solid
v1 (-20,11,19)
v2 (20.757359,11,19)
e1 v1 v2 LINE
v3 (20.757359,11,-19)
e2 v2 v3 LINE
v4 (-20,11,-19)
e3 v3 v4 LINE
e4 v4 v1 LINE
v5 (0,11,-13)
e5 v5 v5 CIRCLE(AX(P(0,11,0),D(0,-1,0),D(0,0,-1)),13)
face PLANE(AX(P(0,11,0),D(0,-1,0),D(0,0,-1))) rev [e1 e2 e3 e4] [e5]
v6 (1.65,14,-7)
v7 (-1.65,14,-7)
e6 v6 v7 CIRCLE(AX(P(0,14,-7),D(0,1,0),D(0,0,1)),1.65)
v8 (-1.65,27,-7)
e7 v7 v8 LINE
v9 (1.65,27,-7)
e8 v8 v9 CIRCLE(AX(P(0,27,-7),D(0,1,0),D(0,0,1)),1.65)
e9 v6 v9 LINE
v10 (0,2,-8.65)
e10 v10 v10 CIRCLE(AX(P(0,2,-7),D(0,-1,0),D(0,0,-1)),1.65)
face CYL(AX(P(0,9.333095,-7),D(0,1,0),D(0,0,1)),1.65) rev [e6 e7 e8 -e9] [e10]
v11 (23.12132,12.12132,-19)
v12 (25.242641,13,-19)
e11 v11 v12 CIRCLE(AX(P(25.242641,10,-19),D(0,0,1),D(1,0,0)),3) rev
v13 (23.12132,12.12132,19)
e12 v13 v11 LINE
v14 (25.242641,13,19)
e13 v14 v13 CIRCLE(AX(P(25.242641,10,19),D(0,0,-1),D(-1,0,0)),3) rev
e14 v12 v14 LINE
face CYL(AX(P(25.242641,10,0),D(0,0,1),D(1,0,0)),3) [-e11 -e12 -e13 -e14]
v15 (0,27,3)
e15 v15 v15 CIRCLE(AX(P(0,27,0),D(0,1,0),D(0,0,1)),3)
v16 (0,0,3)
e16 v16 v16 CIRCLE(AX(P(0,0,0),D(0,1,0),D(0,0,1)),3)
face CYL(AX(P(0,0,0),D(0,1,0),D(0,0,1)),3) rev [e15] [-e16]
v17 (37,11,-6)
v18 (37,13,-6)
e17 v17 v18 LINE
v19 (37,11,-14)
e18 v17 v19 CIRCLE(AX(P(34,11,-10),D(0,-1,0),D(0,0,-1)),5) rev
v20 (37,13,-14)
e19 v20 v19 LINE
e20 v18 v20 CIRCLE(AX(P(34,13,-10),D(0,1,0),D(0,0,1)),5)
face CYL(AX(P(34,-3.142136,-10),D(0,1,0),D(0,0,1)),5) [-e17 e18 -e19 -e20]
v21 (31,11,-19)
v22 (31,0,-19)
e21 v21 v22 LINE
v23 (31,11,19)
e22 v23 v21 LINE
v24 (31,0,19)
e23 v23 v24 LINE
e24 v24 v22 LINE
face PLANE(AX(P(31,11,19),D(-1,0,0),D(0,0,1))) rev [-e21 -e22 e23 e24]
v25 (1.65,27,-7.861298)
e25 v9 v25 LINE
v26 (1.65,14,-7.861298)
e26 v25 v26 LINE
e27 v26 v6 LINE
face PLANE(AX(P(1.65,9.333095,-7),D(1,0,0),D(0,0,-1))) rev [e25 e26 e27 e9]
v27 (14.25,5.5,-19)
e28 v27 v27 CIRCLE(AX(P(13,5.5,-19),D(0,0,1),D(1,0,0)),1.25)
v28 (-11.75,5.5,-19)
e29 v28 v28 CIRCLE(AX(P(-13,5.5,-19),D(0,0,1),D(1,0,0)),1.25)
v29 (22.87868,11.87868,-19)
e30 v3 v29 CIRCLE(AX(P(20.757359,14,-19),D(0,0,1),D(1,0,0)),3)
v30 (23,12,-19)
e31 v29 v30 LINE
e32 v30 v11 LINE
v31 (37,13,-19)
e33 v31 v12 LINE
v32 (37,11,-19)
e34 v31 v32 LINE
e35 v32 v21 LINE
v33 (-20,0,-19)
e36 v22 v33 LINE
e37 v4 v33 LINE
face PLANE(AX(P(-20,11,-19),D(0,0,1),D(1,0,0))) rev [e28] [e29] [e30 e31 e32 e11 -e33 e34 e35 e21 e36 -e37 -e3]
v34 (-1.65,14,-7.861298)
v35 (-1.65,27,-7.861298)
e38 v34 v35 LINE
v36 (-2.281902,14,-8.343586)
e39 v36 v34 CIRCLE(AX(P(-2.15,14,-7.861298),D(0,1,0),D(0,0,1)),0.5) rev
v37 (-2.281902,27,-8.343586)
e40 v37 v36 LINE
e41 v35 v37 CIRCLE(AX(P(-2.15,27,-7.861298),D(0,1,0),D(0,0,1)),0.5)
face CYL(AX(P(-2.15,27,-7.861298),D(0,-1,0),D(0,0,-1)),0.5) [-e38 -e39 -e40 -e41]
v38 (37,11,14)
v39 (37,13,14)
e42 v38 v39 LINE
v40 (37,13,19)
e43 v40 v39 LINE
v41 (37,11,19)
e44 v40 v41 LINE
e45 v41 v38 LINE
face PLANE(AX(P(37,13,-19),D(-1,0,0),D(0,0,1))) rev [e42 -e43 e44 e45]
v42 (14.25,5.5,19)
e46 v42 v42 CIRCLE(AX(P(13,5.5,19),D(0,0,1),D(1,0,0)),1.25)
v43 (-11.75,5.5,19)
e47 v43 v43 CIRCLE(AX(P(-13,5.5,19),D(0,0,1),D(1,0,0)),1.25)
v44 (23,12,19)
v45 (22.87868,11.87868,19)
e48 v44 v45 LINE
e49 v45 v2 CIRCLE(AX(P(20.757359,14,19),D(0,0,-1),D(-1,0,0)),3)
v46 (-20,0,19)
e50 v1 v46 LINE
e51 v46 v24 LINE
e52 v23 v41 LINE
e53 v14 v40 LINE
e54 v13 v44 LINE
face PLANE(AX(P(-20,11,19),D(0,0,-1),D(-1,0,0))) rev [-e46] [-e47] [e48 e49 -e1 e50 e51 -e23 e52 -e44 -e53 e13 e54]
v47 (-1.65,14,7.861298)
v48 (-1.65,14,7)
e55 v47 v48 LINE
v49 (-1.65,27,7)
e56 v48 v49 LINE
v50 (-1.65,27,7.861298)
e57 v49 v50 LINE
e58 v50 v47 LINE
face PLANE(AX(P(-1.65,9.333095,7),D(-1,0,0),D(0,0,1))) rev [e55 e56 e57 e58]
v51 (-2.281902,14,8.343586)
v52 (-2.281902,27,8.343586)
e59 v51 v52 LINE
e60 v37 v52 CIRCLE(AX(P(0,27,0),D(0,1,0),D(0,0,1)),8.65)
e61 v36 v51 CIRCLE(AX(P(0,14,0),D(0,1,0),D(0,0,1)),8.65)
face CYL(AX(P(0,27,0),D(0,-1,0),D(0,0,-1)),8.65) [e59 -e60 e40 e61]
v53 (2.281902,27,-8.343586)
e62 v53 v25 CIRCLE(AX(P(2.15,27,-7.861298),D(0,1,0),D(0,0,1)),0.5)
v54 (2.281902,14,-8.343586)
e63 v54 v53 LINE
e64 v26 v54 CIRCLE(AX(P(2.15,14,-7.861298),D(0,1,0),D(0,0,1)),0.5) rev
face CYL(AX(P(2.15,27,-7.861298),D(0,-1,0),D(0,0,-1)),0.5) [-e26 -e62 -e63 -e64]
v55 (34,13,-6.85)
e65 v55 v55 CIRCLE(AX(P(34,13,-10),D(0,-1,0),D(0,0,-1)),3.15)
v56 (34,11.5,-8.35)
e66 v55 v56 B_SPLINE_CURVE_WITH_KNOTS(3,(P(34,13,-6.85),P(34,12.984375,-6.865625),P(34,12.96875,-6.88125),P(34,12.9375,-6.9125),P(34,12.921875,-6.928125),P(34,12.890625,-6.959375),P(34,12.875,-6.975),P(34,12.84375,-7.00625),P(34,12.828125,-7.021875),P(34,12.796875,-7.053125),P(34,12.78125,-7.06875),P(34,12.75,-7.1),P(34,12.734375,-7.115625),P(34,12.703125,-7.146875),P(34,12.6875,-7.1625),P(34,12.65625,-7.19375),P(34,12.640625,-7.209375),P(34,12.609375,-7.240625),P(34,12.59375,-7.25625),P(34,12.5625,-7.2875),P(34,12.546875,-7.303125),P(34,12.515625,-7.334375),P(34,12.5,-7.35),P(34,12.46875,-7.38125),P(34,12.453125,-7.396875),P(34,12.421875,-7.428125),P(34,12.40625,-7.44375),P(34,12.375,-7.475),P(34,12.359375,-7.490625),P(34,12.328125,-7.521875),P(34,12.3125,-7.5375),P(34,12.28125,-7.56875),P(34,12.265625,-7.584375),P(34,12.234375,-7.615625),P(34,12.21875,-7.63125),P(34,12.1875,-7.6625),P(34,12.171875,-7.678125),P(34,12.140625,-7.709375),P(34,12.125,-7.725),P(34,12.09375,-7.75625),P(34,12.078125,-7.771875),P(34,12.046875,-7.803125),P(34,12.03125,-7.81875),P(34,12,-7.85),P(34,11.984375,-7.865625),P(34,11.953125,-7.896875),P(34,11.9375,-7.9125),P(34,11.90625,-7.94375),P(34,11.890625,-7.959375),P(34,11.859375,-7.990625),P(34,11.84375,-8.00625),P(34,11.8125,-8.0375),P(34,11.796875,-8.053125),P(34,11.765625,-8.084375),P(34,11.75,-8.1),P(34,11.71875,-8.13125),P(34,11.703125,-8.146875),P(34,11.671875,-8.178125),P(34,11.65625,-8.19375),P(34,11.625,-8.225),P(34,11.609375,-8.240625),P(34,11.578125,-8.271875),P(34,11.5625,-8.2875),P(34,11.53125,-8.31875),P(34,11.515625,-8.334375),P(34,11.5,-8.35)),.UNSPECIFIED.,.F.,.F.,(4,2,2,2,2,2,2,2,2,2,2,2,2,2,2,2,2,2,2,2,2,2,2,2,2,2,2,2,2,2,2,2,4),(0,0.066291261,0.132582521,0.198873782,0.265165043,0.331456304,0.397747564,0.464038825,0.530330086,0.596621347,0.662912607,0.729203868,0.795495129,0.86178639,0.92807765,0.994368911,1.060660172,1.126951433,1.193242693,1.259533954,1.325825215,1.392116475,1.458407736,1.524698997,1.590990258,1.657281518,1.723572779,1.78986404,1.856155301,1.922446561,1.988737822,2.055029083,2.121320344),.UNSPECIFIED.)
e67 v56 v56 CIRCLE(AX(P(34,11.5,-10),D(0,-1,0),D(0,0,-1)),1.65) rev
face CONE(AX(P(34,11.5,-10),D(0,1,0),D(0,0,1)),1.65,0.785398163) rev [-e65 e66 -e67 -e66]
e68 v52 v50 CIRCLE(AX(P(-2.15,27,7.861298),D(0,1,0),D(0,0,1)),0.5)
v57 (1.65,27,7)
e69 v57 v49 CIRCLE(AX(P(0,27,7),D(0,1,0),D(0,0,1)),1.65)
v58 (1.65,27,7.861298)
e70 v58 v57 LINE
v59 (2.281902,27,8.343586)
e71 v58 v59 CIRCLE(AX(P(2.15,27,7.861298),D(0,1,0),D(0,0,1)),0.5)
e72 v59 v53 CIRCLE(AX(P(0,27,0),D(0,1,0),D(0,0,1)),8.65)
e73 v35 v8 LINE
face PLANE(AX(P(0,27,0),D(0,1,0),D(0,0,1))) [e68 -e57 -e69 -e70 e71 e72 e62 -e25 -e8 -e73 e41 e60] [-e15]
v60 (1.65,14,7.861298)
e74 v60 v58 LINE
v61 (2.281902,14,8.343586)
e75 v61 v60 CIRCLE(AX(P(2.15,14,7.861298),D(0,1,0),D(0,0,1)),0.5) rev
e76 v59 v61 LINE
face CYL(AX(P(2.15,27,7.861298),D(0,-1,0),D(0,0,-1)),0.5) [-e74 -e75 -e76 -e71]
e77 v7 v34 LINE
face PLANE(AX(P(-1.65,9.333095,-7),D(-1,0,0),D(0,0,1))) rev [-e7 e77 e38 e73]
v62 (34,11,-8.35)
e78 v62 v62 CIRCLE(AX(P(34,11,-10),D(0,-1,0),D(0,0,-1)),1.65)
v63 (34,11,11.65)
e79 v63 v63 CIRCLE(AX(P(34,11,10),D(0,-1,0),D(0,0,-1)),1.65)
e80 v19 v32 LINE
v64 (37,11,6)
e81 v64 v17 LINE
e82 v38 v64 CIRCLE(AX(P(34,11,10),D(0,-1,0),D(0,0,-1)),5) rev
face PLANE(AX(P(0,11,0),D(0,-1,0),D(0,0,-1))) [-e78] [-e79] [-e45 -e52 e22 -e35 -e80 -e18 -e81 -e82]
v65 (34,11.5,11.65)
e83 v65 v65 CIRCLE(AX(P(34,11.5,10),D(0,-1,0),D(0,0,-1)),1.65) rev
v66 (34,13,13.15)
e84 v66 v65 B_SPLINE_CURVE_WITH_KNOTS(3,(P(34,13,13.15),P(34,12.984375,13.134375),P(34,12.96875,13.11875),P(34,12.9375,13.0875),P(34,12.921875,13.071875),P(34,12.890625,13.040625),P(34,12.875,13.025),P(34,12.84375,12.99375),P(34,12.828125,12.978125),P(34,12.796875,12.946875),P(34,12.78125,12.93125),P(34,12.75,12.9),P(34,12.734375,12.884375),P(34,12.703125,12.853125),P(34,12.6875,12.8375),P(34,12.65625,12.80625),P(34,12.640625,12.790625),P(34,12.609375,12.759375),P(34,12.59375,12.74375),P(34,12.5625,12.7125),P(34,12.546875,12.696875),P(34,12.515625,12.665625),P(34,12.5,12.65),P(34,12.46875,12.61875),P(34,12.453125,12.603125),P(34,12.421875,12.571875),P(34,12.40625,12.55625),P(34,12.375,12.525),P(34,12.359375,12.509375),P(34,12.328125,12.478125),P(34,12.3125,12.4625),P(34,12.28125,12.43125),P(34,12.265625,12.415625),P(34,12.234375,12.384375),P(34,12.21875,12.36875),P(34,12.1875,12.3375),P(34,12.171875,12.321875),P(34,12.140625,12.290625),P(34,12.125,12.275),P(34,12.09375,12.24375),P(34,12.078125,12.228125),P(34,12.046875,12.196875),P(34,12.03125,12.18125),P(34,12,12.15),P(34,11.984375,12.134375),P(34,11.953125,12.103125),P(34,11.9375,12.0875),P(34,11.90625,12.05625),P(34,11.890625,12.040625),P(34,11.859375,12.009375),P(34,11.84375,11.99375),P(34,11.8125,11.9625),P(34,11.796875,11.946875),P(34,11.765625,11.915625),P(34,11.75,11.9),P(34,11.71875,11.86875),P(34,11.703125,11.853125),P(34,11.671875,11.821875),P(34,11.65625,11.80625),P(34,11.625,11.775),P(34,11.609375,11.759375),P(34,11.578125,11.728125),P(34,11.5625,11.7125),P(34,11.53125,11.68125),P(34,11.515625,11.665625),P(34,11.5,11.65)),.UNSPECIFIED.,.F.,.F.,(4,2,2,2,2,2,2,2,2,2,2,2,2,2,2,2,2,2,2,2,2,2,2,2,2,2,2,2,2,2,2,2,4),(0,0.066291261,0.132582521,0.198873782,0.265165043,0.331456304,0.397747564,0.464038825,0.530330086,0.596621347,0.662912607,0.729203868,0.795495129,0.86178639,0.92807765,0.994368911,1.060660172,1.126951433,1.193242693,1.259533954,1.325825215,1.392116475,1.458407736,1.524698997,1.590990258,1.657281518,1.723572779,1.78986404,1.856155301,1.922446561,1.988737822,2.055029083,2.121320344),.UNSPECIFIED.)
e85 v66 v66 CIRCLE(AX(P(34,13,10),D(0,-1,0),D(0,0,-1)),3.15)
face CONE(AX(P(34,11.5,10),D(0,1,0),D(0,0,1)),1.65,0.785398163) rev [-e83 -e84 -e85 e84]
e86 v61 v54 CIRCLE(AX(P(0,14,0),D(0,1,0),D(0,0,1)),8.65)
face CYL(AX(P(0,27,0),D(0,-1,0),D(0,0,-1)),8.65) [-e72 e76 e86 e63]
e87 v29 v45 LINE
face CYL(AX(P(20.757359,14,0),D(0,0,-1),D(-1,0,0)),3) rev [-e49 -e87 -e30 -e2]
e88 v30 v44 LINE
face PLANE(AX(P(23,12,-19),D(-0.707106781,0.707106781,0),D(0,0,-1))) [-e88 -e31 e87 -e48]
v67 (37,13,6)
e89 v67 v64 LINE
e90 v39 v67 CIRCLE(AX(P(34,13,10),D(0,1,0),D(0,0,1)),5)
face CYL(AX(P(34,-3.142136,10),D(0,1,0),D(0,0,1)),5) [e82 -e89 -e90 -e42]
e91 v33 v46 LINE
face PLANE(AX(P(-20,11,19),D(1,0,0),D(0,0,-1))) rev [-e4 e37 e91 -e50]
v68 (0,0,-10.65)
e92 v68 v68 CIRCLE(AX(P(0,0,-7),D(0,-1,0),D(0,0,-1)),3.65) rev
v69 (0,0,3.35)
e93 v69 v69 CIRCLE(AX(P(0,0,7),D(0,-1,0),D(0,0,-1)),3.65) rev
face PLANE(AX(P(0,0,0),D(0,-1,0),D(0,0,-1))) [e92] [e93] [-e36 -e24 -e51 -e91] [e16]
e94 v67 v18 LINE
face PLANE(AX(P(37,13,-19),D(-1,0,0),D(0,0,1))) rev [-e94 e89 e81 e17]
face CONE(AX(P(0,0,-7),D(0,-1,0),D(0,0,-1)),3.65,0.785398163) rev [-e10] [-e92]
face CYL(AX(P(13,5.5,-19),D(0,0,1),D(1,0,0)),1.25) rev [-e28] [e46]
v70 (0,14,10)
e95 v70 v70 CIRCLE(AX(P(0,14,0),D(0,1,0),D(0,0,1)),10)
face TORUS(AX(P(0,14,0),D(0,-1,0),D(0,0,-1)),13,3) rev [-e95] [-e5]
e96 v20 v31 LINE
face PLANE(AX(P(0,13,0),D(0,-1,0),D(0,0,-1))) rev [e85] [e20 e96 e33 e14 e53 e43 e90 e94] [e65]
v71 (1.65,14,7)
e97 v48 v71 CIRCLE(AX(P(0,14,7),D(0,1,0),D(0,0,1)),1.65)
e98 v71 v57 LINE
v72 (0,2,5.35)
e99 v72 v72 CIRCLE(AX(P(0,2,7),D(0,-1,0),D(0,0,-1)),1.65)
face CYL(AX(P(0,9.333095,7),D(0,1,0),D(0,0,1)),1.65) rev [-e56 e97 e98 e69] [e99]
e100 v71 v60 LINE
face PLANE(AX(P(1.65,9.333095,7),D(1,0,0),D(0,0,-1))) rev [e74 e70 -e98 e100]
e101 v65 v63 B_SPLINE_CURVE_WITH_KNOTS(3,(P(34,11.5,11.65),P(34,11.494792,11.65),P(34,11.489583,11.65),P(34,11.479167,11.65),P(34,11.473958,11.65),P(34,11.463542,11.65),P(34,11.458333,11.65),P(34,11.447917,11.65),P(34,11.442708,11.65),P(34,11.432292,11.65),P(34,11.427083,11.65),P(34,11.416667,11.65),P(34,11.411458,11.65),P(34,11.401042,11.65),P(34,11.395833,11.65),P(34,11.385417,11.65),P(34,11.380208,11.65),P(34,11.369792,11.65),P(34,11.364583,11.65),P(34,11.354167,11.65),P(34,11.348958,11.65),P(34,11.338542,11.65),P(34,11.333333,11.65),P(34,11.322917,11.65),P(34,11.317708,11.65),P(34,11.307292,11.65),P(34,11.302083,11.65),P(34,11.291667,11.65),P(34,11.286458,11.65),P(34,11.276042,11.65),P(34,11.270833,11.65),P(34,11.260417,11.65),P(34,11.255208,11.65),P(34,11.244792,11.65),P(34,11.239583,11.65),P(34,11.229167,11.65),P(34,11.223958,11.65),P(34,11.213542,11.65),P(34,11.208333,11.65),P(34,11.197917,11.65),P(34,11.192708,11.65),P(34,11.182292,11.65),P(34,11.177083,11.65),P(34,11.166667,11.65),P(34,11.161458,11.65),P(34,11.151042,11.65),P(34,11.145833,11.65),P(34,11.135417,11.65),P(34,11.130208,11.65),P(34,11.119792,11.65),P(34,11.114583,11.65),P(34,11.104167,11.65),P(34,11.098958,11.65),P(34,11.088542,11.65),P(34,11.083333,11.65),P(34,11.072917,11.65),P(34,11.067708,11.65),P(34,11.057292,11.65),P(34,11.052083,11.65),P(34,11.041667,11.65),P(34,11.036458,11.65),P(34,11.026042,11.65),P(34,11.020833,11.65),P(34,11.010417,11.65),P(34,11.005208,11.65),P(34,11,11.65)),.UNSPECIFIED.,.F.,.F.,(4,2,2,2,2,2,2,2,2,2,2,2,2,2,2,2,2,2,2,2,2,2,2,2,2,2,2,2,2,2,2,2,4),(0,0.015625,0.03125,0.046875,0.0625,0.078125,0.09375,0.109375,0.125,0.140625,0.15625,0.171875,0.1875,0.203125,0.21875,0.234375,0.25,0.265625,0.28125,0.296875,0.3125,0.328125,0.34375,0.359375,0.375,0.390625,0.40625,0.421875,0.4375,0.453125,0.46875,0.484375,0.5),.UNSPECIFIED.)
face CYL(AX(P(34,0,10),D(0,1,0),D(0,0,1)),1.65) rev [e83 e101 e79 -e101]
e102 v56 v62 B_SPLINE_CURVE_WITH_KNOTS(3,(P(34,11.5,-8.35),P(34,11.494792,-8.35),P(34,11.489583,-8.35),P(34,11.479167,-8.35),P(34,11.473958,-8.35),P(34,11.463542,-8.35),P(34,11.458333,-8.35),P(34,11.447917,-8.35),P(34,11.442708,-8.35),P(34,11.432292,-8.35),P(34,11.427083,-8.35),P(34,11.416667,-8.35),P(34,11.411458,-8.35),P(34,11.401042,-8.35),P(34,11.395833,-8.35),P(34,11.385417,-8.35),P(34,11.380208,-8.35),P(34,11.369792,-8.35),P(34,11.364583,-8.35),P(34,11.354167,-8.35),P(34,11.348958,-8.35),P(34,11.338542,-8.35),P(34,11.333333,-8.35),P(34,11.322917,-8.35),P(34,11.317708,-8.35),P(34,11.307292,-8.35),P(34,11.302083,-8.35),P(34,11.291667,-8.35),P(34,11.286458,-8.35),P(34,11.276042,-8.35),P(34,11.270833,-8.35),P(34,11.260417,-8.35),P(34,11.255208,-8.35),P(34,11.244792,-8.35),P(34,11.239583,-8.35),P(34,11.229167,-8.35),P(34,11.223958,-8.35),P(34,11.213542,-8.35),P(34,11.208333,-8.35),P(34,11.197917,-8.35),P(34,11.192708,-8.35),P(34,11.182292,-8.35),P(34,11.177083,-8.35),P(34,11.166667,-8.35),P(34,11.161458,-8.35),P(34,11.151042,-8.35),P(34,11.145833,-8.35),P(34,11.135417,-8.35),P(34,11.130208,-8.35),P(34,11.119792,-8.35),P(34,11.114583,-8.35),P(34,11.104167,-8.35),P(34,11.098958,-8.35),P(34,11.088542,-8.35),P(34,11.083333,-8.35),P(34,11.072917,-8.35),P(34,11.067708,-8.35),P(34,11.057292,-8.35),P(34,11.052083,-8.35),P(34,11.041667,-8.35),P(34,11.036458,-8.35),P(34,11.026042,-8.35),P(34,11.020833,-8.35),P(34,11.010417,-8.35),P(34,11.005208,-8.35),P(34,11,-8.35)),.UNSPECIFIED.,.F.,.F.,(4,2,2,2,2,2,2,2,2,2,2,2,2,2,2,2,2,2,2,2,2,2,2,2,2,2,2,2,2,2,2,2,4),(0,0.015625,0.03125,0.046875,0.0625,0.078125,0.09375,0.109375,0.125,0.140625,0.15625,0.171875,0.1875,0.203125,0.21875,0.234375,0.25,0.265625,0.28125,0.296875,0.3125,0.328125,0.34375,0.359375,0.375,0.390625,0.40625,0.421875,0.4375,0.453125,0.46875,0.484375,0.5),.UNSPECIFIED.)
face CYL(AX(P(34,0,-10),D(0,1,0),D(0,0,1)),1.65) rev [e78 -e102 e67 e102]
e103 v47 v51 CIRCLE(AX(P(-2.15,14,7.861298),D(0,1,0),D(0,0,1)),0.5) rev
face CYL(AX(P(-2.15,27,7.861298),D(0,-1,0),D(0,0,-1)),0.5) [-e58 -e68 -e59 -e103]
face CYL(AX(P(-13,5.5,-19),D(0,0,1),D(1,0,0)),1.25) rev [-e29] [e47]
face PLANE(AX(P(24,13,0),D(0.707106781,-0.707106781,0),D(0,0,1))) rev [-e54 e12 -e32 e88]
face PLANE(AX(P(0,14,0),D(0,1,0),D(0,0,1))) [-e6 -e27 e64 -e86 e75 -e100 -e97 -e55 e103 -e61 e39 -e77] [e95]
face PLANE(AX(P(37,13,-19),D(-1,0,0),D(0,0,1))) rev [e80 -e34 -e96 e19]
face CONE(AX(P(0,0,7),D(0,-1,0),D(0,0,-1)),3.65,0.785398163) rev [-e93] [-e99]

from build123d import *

# Parameters (mm, degrees)
SKETCH_6_W             = 51
SKETCH_6_H             = 38
EXTRUDE_647_DEPTH      = 11
SKETCH_10_R            = 10
EXTRUDE_856_DEPTH      = 3
FILLET_1_R             = 3
SKETCH_13_R            = 1.25
CUT_EXTRUDE_1173_DEPTH = 52
SKETCH_15_R            = 8.65
EXTRUDE_1309_DEPTH     = 13
CUT_EXTRUDE_START      = -13
CUT_EXTRUDE_1600_DEPTH = 13
SKETCH_26_R            = 1.65
CUT_EXTRUDE_1838_DEPTH = 39.961519478
CHAMFER_7_SIZE         = 2
SKETCH_17_R            = 3
CUT_EXTRUDE_2253_DEPTH = 46.287967497
SKETCH_19_W            = 14
SKETCH_19_H            = 38
EXTRUDE_2866_DEPTH     = 2
SKETCH_20_R            = 1.65
CUT_EXTRUDE_3095_DEPTH = 44.886216515
SKETCH_23_R            = 5
SKETCH_23_R_2          = 1.65
EXTRUDE_3300_DEPTH     = 2
CHAMFER_4_SIZE         = 1
FILLET_7_R             = 3
CHAMFER_6_SIZE         = 1.5
FILLET_8_R             = 0.5


with BuildPart() as part:
    # Эскиз6 → Extrude 647 (new body)
    with BuildSketch(Plane(origin=(0, 0, 0), x_dir=(1, 0, 0), z_dir=(0, 1, 0))):
        with Locations((5.5, 0)):
            Rectangle(SKETCH_6_W, SKETCH_6_H)
    extrude(amount=EXTRUDE_647_DEPTH)

    # Эскиз10 → Extrude 856 (add)
    with BuildSketch(Plane(origin=(0, 11, 0), x_dir=(1, 0, 0), z_dir=(0, 1, 0))):
        with Locations(Location((0, 0, 0), (0, 0, 90))):
            Circle(SKETCH_10_R)
    extrude(amount=EXTRUDE_856_DEPTH)

    # Скругление1
    fillet_1_edges = [part.edges().sort_by_distance(p)[0] for p in [
        (0, 11, 10),
    ]]
    fillet(fillet_1_edges, radius=FILLET_1_R - 0.0001)  # a hair under: the kernel refuses the full size

    # Эскиз13 → Cut-Extrude 1173 (cut, through all)
    with BuildSketch(Plane.XY.offset(19)):
        with Locations((-13, 5.5)):
            Circle(SKETCH_13_R)
        with Locations((13, 5.5)):
            Circle(SKETCH_13_R)
    extrude(amount=-CUT_EXTRUDE_1173_DEPTH, mode=Mode.SUBTRACT)

    # Эскиз15 → Extrude 1309 (add)
    with BuildSketch(Plane(origin=(0, 14, 0), x_dir=(1, 0, 0), z_dir=(0, 1, 0))):
        with Locations(Location((0, 0, 0), (0, 0, 90))):
            Circle(SKETCH_15_R)
    extrude(amount=EXTRUDE_1309_DEPTH)

    # Эскиз16 → Cut-Extrude 1600 (cut)
    with BuildSketch(Plane(origin=(0, 27, 0), x_dir=(1, 0, 0), z_dir=(0, 1, 0)).offset(CUT_EXTRUDE_START)):
        with BuildLine():
            Line((-1.65, 7), (-1.65, 8.491171886))
            ThreePointArc((-1.65, 8.491171886), (0, 8.65), (1.65, 8.491171886))
            Line((1.65, 8.491171886), (1.65, 7))
            ThreePointArc((1.65, 7), (0, 5.35), (-1.65, 7))
        make_face()
        with BuildLine():
            Line((1.65, -7), (1.65, -8.491171886))
            ThreePointArc((1.65, -8.491171886), (0, -8.65), (-1.65, -8.491171886))
            Line((-1.65, -8.491171886), (-1.65, -7))
            ThreePointArc((-1.65, -7), (0, -5.35), (1.65, -7))
        make_face()
    extrude(amount=CUT_EXTRUDE_1600_DEPTH, mode=Mode.SUBTRACT)

    # Эскиз26 → Cut-Extrude 1838 (cut, through all)
    with BuildSketch(Plane(origin=(0, 14, 0), x_dir=(1, 0, 0), z_dir=(0, 1, 0))):
        with Locations(Location((0, 7, 0), (0, 0, 270))):
            Circle(SKETCH_26_R)
        with Locations(Location((0, -7, 0), (0, 0, 270))):
            Circle(SKETCH_26_R)
    extrude(amount=-CUT_EXTRUDE_1838_DEPTH, mode=Mode.SUBTRACT)

    # Фаска7
    chamfer_7_edges = [part.edges().sort_by_distance(p)[0] for p in [
        (0, 0, -8.65),
        (0, 0, 5.35),
    ]]
    chamfer(chamfer_7_edges, length=CHAMFER_7_SIZE)

    # Эскиз17 → Cut-Extrude 2253 (cut, through all)
    with BuildSketch(Plane(origin=(0, 27, 0), x_dir=(1, 0, 0), z_dir=(0, 1, 0))):
        with Locations(Location((0, 0, 0), (0, 0, 270))):
            Circle(SKETCH_17_R)
    extrude(amount=-CUT_EXTRUDE_2253_DEPTH, mode=Mode.SUBTRACT)

    # Эскиз19 → Extrude 2866 (add)
    with BuildSketch(Plane(origin=(0, 11, 0), x_dir=(1, 0, 0), z_dir=(0, 1, 0))):
        with Locations((30, 0)):
            Rectangle(SKETCH_19_W, SKETCH_19_H)
    extrude(amount=EXTRUDE_2866_DEPTH)

    # Эскиз20 → Cut-Extrude 3095 (cut, through all)
    with BuildSketch(Plane(origin=(0, 13, 0), x_dir=(1, 0, 0), z_dir=(0, 1, 0))):
        with Locations(Location((34, 10, 0), (0, 0, 270))):
            Circle(SKETCH_20_R)
        with Locations(Location((34, -10, 0), (0, 0, 270))):
            Circle(SKETCH_20_R)
    extrude(amount=-CUT_EXTRUDE_3095_DEPTH, mode=Mode.SUBTRACT)

    # Эскиз23 → Extrude 3300 (add)
    # profile 1 of 2: a face of its own
    with BuildSketch(Plane(origin=(0, 13, 0), x_dir=(1, 0, 0), z_dir=(0, 1, 0))):
        with Locations((34, 10)):
            Circle(SKETCH_23_R)
        with Locations(Location((34, 10, 0), (0, 0, 270))):
            Circle(SKETCH_23_R_2, mode=Mode.SUBTRACT)
    # profile 2 of 2: a face of its own
    with BuildSketch(Plane(origin=(0, 13, 0), x_dir=(1, 0, 0), z_dir=(0, 1, 0))):
        with Locations((34, -10)):
            Circle(SKETCH_23_R)
        with Locations(Location((34, -10, 0), (0, 0, 270))):
            Circle(SKETCH_23_R_2, mode=Mode.SUBTRACT)
    extrude(amount=-EXTRUDE_3300_DEPTH)

    # Фаска4
    chamfer_4_edges = [part.edges().sort_by_distance(p)[0] for p in [
        (23, 11, 0),
    ]]
    chamfer(chamfer_4_edges, length=CHAMFER_4_SIZE)
    chamfer_4_2_edges = [part.edges().sort_by_distance(p)[0] for p in [
        (23, 13, 0),
    ]]
    chamfer(chamfer_4_2_edges, length=CHAMFER_4_SIZE - 0.0001)  # a hair under: the kernel refuses the full size

    # Скругление7
    fillet_7_edges = [part.edges().sort_by_distance(p)[0] for p in [
        (23.9999, 13, 0),
        (22, 11, 0),
    ]]
    fillet(fillet_7_edges, radius=FILLET_7_R)

    # Фаска6
    chamfer_6_edges = [part.edges().sort_by_distance(p)[0] for p in [
        (34, 13, -11.65),
        (34, 13, 8.35),
    ]]
    chamfer(chamfer_6_edges, length=CHAMFER_6_SIZE)

    # Скругление8
    fillet_8_edges = [part.edges().sort_by_distance(p)[0] for p in [
        (-1.65, 20.5, -8.491171886),
        (1.65, 20.5, -8.491171886),
        (1.65, 20.5, 8.491171886),
        (-1.65, 20.5, 8.491171886),
    ]]
    fillet(fillet_8_edges, radius=FILLET_8_R)


solid = part.part
